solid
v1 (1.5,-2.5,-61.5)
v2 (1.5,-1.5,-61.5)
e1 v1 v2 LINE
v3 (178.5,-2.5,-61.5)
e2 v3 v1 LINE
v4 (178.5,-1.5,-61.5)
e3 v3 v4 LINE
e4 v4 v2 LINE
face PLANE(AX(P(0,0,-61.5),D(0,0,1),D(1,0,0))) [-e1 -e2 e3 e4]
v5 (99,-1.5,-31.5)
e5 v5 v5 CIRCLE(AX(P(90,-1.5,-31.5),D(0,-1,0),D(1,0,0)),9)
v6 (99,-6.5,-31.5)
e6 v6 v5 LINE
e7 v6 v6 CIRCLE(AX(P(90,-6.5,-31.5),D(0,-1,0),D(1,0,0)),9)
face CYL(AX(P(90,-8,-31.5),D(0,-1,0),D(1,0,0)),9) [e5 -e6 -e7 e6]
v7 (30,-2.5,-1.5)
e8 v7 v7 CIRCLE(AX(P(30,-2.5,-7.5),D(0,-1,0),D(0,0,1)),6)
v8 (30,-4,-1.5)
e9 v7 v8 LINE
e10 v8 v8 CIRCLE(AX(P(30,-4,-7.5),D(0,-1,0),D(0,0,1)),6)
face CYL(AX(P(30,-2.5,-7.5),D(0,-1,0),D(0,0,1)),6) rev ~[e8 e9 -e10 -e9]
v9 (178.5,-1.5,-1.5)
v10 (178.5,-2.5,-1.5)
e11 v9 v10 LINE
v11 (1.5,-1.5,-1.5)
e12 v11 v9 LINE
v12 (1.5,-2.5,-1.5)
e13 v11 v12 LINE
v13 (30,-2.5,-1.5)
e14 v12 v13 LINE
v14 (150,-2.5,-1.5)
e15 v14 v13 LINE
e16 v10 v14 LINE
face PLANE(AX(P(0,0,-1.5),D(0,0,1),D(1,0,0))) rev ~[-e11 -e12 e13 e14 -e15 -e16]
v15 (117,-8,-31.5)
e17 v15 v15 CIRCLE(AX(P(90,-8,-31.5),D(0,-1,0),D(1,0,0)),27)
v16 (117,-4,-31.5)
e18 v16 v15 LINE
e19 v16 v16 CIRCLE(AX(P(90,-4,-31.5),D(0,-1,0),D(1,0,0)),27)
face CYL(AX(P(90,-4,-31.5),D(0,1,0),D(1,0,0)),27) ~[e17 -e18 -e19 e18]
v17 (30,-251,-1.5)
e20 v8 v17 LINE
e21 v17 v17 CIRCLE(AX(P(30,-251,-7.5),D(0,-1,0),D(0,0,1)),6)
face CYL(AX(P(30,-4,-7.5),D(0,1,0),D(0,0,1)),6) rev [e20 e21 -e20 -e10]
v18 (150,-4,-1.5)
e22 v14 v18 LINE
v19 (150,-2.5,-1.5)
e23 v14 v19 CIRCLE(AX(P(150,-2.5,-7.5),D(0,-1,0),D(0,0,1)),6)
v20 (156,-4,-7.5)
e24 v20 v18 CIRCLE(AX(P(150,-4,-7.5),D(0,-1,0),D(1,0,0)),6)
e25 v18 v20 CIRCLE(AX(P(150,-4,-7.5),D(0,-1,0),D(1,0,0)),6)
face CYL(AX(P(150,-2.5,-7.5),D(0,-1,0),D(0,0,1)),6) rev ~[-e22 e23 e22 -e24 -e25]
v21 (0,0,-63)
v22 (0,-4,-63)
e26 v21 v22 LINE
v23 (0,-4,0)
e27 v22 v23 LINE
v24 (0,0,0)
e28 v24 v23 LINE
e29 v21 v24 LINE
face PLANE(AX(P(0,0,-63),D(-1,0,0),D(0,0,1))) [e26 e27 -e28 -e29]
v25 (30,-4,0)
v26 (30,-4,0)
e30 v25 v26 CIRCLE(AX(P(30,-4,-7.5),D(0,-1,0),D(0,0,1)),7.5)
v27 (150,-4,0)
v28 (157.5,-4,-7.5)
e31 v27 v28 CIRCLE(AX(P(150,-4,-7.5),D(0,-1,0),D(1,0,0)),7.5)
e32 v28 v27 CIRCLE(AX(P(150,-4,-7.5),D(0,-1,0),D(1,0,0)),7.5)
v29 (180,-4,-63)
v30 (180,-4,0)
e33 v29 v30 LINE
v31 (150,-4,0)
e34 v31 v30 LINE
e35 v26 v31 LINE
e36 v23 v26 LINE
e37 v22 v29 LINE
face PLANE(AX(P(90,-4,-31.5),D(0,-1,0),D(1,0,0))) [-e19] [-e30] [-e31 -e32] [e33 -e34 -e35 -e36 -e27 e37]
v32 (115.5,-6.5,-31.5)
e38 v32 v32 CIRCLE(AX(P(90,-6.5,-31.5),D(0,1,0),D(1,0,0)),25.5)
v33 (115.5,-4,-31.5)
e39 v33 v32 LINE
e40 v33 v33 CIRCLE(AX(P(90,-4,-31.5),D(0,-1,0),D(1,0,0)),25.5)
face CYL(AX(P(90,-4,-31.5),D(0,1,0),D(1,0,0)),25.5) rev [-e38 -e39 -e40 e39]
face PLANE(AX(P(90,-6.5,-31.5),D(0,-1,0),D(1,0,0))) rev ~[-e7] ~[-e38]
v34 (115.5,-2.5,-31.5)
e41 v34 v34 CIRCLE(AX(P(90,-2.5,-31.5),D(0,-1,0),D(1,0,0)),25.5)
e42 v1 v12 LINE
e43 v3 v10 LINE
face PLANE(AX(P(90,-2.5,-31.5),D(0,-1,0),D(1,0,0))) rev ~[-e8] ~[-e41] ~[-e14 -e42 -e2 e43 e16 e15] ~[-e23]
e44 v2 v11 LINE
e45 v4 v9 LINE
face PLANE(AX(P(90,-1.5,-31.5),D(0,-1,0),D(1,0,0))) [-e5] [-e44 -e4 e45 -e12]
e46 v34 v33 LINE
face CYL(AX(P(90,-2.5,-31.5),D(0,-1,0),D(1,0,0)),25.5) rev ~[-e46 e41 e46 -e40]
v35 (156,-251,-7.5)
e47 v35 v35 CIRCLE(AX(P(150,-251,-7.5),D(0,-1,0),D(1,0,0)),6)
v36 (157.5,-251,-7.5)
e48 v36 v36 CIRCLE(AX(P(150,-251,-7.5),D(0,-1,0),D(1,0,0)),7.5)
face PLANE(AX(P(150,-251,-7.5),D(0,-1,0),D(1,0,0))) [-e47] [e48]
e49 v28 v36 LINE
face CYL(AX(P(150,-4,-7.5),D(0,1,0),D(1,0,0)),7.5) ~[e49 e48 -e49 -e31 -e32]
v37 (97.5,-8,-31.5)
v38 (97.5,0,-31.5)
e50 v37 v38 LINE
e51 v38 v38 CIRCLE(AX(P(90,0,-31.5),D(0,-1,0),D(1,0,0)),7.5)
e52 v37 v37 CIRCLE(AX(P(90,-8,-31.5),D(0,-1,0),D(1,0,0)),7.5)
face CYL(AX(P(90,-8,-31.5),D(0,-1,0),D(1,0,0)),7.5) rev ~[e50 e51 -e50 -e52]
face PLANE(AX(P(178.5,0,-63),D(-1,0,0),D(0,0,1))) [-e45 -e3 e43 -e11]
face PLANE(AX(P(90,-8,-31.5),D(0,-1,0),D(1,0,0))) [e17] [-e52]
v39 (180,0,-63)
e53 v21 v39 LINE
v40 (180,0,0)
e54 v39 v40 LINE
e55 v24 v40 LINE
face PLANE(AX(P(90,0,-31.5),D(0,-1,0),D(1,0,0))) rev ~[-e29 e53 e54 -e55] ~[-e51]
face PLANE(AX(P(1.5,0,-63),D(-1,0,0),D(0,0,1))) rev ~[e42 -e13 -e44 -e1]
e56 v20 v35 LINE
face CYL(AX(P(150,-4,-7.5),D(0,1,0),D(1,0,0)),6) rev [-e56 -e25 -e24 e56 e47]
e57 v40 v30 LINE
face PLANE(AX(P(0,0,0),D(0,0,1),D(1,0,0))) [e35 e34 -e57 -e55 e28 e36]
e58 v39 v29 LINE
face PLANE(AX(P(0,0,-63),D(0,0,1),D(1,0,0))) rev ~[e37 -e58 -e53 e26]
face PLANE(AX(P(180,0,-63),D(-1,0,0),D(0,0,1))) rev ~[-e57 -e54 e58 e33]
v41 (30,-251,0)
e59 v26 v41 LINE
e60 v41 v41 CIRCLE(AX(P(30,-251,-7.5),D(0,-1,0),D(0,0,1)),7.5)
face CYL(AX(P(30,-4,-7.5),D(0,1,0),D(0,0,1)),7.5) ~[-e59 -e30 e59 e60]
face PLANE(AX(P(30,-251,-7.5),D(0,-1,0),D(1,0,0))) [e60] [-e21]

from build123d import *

# Parameters (mm, degrees)
F0_W     = 180
F0_H     = 63
F1_DEPTH = 4
F2_R     = 27
F3_DEPTH = 4
F4_DEPTH = 247
F5_R     = 7.5
F6_DEPTH = 25
F7_T     = 1.5


# Not quite as in the source:
# - a shell that OpenCascade refuses in one call is made with other operations: the cavity is built on its own and cut out


with BuildPart() as f1:
    # F0 (on Front) → F1 (new body)
    with BuildSketch(Plane.XZ):
        with Locations((90, -31.5)):
            Rectangle(F0_W, F0_H)
    extrude(amount=F1_DEPTH)

    # F2 (on face) → F3 (join)
    with BuildSketch(Plane.XZ.offset(4)):
        with Locations((90, -31.5)):
            Circle(F2_R)
    extrude(amount=F3_DEPTH)

    # F2 (on face) → F4 (join)
    with BuildSketch(Plane.XZ.offset(4)):
        with BuildLine():
            ThreePointArc((37.5, -7.5), (35.3033008593, -2.1966991415), (30.0000000011, 0))
            ThreePointArc((30.0000000011, 0), (24.6966991407, -12.8033008585), (37.5, -7.5))
        make_face()
        with BuildLine():
            ThreePointArc((150, 0), (144.6966991411, -12.8033008589), (157.5, -7.5))
            ThreePointArc((157.5, -7.5), (155.3033008589, -2.1966991411), (150, 0))
        make_face()
    extrude(amount=F4_DEPTH)

    # F5 (on face) → F6 (cut)
    with BuildSketch(Plane.XZ.offset(8)):
        with Locations((90, -31.5)):
            Circle(F5_R)
    extrude(amount=-F6_DEPTH, mode=Mode.SUBTRACT)

    # F7: shell of thickness 1.5, made by hand


with BuildPart() as f7_core1:
    # F7_t2: copy of F1
    add(f1.part)

    # the walls: a layer under each face that stays
    f7_faces = [f7_core1.faces().sort_by_distance(p)[0] for p in [
        (90, -2, 0),
        (180, -2, -31.5),
        (0, -2, -31.5),
        (30, 0, -52.5),
        (30, -4, -52.5),
        (90, -2, -63),
        (82.5, -4, -31.5),
        (63, -6, -31.5),
        (29.9999999989, -127.5, -15),
        (150, -127.5, -15),
        (72, -8, -49.5),
    ]]
    thicken(f7_faces, amount=-F7_T, mode=Mode.SUBTRACT)

    # F7_s3 → F7_t4 (revolve, cut)
    with BuildSketch(Plane.XY.offset(-31.5)):
        Polygon((117.015, -4.015), (117, -2.5), (115.5, -2.5), (115.5, -4), align=None)
    revolve(axis=Axis((90, -4, -31.5), (0, -1, 0)), mode=Mode.SUBTRACT)

    # F7_s5 → F7_t6 (revolve, cut)
    with BuildSketch(Plane.YZ.offset(30)):
        Polygon((-4.015, 0.015), (-2.5, 0), (-2.5, -1.5), (-4, -1.5), align=None)
    revolve(axis=Axis((30, -4, -7.5), (0, -1, 0)), mode=Mode.SUBTRACT)

    # F7_s7 → F7_t8 (revolve, cut)
    with BuildSketch(Plane.YZ.offset(150)):
        Polygon((-4.015, 0.015), (-2.5, 0), (-2.5, -1.5), (-4, -1.5), align=None)
    revolve(axis=Axis((150, -4, -7.5), (0, -1, 0)), mode=Mode.SUBTRACT)


with BuildPart() as f1_1:
    add(f1.part)

    # what is left inside the walls is the cavity
    f7_cavity = [f7_core1.part.solids().sort_by_distance(p)[0] for p in [
        (90, -1.515, -41.5),
    ]]
    add(f7_cavity, mode=Mode.SUBTRACT)


solid = f1_1.part
